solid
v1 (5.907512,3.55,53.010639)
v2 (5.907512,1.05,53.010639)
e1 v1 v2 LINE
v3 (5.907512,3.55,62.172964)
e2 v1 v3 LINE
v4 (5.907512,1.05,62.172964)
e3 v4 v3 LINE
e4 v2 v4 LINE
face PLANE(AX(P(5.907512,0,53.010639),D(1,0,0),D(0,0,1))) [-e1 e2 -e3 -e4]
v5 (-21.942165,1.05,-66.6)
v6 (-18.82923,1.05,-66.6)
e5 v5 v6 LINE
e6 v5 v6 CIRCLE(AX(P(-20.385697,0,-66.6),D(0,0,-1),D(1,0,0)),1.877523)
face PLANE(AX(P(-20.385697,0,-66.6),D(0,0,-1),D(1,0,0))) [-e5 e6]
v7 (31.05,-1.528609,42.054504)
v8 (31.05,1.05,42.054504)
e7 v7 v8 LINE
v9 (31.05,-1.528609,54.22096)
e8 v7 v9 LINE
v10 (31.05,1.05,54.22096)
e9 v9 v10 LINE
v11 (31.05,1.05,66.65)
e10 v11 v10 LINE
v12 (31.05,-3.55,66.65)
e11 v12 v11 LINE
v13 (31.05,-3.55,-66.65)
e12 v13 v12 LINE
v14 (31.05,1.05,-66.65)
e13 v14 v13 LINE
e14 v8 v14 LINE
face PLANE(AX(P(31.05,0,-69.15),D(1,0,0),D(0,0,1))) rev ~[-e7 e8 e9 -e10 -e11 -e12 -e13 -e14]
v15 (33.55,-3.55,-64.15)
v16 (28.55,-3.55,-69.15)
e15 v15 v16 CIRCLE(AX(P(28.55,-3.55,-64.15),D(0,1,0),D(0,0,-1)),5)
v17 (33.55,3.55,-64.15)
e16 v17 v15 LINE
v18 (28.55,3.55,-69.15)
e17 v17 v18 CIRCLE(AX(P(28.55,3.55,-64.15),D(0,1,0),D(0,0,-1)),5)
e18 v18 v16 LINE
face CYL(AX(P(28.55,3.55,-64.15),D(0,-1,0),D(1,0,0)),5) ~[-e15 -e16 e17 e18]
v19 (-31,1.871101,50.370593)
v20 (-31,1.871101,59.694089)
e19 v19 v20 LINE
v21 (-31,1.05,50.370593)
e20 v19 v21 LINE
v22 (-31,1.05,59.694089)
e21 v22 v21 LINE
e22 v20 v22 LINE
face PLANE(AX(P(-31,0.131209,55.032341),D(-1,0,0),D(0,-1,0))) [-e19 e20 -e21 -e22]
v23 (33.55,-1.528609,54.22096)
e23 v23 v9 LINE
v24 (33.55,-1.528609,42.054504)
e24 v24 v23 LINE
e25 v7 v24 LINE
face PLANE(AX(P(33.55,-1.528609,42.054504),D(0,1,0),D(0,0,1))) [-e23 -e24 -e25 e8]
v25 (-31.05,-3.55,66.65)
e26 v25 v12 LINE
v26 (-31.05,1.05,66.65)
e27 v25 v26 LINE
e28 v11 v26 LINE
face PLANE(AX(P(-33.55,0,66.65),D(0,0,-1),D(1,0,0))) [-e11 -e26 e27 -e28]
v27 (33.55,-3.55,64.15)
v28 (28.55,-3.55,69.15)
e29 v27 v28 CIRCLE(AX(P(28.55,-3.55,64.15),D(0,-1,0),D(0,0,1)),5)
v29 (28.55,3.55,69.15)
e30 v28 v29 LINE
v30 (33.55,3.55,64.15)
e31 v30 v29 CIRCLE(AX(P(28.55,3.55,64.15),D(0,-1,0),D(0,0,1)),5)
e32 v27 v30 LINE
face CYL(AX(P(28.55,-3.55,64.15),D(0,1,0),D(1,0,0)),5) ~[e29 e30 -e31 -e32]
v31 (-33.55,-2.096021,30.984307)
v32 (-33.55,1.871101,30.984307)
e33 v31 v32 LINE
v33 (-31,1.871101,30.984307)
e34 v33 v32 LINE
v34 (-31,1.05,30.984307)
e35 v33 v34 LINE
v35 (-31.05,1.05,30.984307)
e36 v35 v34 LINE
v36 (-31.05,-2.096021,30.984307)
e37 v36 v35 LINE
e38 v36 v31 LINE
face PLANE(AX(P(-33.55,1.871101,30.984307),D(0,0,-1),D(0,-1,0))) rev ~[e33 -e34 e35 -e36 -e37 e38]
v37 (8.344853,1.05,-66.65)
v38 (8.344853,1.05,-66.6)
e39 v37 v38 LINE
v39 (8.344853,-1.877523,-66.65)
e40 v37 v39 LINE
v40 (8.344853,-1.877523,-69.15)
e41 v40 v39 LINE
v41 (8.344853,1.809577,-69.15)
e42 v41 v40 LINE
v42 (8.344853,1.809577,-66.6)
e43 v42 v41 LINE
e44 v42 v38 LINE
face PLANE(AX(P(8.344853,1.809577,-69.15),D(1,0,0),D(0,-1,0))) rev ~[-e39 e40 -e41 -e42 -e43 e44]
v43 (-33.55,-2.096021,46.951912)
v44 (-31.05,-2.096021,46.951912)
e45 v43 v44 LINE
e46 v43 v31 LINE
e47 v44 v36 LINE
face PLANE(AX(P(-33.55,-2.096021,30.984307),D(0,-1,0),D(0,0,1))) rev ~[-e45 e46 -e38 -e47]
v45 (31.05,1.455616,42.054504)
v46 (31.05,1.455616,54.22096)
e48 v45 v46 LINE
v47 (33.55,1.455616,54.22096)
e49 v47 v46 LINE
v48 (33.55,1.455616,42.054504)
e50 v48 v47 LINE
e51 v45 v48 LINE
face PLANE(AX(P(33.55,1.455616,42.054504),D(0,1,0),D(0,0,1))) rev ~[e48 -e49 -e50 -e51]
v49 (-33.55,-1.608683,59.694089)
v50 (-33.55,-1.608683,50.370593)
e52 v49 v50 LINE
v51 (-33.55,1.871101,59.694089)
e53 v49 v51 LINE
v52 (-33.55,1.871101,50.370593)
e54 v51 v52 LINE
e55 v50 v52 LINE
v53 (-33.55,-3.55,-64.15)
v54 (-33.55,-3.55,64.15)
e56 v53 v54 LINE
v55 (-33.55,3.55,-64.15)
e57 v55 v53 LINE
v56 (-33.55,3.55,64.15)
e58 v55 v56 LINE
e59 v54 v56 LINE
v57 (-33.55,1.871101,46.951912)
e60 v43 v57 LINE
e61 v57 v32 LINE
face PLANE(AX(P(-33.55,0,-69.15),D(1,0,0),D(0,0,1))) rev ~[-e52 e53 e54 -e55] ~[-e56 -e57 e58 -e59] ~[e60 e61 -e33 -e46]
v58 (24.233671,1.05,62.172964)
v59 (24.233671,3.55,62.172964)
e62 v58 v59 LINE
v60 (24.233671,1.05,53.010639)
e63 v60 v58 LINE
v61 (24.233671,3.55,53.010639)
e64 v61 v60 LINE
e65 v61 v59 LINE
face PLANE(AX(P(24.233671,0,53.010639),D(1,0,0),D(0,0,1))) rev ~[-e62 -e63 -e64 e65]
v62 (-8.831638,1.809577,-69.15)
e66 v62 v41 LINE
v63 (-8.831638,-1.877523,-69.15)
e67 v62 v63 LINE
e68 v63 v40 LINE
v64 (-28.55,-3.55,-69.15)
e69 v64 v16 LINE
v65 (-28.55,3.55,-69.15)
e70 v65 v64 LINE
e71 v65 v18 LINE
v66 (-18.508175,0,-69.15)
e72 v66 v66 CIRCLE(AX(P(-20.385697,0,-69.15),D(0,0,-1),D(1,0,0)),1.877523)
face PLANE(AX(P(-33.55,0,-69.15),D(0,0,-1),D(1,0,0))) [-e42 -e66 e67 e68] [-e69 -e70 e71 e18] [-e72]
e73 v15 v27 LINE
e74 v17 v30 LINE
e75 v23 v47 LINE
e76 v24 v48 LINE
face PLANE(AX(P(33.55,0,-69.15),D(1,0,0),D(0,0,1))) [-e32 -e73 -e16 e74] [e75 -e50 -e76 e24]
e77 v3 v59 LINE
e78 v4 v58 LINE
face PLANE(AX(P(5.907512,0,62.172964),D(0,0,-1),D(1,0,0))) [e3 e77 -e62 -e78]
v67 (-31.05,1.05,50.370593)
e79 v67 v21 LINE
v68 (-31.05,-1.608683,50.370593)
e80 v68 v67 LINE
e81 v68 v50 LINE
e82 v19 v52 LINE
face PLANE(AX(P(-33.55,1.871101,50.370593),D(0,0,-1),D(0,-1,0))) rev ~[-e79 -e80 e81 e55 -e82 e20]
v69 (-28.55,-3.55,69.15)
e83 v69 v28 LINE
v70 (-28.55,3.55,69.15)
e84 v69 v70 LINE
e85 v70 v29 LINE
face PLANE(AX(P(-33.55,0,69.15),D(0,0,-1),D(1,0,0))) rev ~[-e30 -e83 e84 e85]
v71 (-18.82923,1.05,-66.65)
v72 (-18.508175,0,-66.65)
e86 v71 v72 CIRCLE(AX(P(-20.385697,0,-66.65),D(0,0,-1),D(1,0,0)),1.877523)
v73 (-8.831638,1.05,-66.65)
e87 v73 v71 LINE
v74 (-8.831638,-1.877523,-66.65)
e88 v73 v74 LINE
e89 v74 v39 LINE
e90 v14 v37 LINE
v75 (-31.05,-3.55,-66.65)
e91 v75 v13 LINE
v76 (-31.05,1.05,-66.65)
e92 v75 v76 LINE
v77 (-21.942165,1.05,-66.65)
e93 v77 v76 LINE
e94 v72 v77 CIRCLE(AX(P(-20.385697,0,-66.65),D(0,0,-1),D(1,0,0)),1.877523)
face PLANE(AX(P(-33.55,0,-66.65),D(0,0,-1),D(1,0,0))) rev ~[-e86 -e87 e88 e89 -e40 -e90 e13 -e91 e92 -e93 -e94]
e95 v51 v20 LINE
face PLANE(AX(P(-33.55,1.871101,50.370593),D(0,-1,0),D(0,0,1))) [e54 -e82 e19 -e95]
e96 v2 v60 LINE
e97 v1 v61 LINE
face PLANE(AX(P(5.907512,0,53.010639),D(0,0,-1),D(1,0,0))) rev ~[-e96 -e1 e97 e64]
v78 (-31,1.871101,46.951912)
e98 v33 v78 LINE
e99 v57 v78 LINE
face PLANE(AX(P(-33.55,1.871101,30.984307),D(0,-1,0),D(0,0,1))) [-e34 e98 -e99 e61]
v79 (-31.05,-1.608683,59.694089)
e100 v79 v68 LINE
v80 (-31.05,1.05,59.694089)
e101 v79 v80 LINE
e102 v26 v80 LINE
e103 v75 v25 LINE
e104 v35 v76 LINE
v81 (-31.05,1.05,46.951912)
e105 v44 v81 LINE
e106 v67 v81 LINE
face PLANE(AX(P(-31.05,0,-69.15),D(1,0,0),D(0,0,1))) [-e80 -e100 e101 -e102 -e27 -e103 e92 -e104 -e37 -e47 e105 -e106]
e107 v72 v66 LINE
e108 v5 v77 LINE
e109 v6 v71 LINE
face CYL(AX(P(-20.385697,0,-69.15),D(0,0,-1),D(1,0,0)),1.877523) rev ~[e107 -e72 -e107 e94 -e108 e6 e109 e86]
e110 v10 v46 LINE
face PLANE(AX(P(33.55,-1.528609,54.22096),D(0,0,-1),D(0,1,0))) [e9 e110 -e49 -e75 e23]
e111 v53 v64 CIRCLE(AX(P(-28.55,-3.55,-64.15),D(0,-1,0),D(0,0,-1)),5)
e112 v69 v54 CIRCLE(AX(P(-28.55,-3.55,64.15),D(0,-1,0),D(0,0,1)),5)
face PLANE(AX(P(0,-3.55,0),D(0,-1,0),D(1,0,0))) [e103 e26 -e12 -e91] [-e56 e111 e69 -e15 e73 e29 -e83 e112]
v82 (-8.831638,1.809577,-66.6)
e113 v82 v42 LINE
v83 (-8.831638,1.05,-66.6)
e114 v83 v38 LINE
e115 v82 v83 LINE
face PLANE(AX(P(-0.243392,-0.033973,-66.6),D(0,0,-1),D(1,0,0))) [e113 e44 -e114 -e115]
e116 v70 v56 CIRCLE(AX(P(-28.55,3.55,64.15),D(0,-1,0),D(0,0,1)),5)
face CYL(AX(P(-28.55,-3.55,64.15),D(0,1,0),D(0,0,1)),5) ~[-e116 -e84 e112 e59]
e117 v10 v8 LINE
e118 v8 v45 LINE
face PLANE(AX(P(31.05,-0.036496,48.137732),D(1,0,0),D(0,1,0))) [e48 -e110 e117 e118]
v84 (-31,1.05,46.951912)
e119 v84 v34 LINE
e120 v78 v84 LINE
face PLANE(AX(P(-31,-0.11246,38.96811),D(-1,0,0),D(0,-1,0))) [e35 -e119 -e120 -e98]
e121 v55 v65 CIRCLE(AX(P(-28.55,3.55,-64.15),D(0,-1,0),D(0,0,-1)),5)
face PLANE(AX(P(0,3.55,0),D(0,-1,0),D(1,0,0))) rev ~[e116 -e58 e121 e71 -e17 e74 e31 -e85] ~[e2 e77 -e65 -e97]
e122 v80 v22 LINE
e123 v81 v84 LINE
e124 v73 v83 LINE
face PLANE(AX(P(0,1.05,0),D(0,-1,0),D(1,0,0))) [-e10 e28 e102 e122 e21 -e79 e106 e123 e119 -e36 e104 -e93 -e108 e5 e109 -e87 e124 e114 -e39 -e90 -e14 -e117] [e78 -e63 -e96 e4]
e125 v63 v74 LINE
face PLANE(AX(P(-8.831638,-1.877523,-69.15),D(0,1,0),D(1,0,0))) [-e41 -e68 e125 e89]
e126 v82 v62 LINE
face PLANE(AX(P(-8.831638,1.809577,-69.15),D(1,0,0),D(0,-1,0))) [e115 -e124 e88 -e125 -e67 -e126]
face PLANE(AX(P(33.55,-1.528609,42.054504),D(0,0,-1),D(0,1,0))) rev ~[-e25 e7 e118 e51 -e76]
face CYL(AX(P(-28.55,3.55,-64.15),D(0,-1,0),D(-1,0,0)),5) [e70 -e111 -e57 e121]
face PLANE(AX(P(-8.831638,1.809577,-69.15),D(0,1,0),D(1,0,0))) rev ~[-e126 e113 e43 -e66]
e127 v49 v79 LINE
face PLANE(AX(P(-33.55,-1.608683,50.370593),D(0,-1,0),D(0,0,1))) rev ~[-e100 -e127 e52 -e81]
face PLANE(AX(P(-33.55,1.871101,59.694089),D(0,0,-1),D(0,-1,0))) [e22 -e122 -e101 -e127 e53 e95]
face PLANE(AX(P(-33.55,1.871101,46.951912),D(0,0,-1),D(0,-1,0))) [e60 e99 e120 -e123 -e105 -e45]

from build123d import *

# Parameters (mm, degrees)
F0_W      = 67.1
F0_H      = 138.3
F1_DEPTH  = 3.55
F2_T      = -2.5
F3_R      = 5
F4_W      = 18.3261586353
F4_H      = 9.162325412
F5_DEPTH  = 12.5
F6_W      = 17.1764912084
F6_H      = 3.6870999029
F7_DEPTH  = 2.55
F8_W      = 3.479784471
F8_H      = 9.3234963715
F9_DEPTH  = 2.55
F10_W     = 3.967121942
F10_H     = 15.9676056355
F11_DEPTH = 2.55
F12_R     = 1.8775227945
F13_DEPTH = 2.55
F17_W     = 2.9842249351
F17_H     = 12.1664553881
F18_DEPTH = 2.5


# Not quite as in the source:
# - the program builds the solid bodies; features that only make, move or delete a surface that nothing else refers to are left out


with BuildPart() as f1:
    # F0 (on Front) → F1 (new body, symmetric)
    with BuildSketch(Plane.XZ):
        Rectangle(F0_W, F0_H)
    extrude(amount=F1_DEPTH, both=True)

    # F2
    f2_openings = [f1.faces().sort_by_distance(p)[0] for p in [
        (0, -3.55, 0),
    ]]
    offset(amount=F2_T, openings=f2_openings)

    # F3
    f3_edges = [f1.edges().sort_by_distance(p)[0] for p in [
        (-33.55, 0, 69.15),
        (33.55, 0, 69.15),
        (-33.55, 0, -69.15),
        (33.55, 0, -69.15),
    ]]
    fillet(f3_edges, radius=F3_R)

    # F4 (on Front) → F5 (cut, symmetric)
    with BuildSketch(Plane.XZ):
        with Locations((15.0705915876, 57.5918015093)):
            Rectangle(F4_W, F4_H)
    extrude(amount=F5_DEPTH, both=True, mode=Mode.SUBTRACT)

    # F6 (on face) → F7 (cut, symmetric)
    with BuildSketch(Plane(origin=(0, 0, -69.15), x_dir=(1, 0, 0), z_dir=(0, 0, -1))):
        with Locations((-0.2433923073, 0.0339728431)):
            Rectangle(F6_W, F6_H)
    extrude(amount=F7_DEPTH, both=True, mode=Mode.SUBTRACT)

    # F8 (on face) → F9 (cut, symmetric)
    with BuildSketch(Plane(origin=(-33.55, 0, 0), x_dir=(0, -1, 0), z_dir=(-1, 0, 0))):
        with Locations((-0.1312090899, 55.0323408097)):
            Rectangle(F8_W, F8_H)
    extrude(amount=F9_DEPTH, both=True, mode=Mode.SUBTRACT)

    # F10 (on face) → F11 (cut, symmetric)
    with BuildSketch(Plane(origin=(-33.55, 0, 0), x_dir=(0, -1, 0), z_dir=(-1, 0, 0))):
        with Locations((0.1124596456, 38.9681095257)):
            Rectangle(F10_W, F10_H)
    extrude(amount=F11_DEPTH, both=True, mode=Mode.SUBTRACT)

    # F12 (on face) → F13 (cut, symmetric)
    with BuildSketch(Plane(origin=(0, 0, -69.15), x_dir=(1, 0, 0), z_dir=(0, 0, -1))):
        with Locations((-20.385697484, 0)):
            Circle(F12_R)
    extrude(amount=F13_DEPTH, both=True, mode=Mode.SUBTRACT)

    # F17 (on face) → F18 (cut, symmetric)
    with BuildSketch(Plane.YZ.offset(33.55)):
        with Locations((-0.036496378, 48.1377318501)):
            Rectangle(F17_W, F17_H)
    extrude(amount=F18_DEPTH, both=True, mode=Mode.SUBTRACT)


solid = f1.part
